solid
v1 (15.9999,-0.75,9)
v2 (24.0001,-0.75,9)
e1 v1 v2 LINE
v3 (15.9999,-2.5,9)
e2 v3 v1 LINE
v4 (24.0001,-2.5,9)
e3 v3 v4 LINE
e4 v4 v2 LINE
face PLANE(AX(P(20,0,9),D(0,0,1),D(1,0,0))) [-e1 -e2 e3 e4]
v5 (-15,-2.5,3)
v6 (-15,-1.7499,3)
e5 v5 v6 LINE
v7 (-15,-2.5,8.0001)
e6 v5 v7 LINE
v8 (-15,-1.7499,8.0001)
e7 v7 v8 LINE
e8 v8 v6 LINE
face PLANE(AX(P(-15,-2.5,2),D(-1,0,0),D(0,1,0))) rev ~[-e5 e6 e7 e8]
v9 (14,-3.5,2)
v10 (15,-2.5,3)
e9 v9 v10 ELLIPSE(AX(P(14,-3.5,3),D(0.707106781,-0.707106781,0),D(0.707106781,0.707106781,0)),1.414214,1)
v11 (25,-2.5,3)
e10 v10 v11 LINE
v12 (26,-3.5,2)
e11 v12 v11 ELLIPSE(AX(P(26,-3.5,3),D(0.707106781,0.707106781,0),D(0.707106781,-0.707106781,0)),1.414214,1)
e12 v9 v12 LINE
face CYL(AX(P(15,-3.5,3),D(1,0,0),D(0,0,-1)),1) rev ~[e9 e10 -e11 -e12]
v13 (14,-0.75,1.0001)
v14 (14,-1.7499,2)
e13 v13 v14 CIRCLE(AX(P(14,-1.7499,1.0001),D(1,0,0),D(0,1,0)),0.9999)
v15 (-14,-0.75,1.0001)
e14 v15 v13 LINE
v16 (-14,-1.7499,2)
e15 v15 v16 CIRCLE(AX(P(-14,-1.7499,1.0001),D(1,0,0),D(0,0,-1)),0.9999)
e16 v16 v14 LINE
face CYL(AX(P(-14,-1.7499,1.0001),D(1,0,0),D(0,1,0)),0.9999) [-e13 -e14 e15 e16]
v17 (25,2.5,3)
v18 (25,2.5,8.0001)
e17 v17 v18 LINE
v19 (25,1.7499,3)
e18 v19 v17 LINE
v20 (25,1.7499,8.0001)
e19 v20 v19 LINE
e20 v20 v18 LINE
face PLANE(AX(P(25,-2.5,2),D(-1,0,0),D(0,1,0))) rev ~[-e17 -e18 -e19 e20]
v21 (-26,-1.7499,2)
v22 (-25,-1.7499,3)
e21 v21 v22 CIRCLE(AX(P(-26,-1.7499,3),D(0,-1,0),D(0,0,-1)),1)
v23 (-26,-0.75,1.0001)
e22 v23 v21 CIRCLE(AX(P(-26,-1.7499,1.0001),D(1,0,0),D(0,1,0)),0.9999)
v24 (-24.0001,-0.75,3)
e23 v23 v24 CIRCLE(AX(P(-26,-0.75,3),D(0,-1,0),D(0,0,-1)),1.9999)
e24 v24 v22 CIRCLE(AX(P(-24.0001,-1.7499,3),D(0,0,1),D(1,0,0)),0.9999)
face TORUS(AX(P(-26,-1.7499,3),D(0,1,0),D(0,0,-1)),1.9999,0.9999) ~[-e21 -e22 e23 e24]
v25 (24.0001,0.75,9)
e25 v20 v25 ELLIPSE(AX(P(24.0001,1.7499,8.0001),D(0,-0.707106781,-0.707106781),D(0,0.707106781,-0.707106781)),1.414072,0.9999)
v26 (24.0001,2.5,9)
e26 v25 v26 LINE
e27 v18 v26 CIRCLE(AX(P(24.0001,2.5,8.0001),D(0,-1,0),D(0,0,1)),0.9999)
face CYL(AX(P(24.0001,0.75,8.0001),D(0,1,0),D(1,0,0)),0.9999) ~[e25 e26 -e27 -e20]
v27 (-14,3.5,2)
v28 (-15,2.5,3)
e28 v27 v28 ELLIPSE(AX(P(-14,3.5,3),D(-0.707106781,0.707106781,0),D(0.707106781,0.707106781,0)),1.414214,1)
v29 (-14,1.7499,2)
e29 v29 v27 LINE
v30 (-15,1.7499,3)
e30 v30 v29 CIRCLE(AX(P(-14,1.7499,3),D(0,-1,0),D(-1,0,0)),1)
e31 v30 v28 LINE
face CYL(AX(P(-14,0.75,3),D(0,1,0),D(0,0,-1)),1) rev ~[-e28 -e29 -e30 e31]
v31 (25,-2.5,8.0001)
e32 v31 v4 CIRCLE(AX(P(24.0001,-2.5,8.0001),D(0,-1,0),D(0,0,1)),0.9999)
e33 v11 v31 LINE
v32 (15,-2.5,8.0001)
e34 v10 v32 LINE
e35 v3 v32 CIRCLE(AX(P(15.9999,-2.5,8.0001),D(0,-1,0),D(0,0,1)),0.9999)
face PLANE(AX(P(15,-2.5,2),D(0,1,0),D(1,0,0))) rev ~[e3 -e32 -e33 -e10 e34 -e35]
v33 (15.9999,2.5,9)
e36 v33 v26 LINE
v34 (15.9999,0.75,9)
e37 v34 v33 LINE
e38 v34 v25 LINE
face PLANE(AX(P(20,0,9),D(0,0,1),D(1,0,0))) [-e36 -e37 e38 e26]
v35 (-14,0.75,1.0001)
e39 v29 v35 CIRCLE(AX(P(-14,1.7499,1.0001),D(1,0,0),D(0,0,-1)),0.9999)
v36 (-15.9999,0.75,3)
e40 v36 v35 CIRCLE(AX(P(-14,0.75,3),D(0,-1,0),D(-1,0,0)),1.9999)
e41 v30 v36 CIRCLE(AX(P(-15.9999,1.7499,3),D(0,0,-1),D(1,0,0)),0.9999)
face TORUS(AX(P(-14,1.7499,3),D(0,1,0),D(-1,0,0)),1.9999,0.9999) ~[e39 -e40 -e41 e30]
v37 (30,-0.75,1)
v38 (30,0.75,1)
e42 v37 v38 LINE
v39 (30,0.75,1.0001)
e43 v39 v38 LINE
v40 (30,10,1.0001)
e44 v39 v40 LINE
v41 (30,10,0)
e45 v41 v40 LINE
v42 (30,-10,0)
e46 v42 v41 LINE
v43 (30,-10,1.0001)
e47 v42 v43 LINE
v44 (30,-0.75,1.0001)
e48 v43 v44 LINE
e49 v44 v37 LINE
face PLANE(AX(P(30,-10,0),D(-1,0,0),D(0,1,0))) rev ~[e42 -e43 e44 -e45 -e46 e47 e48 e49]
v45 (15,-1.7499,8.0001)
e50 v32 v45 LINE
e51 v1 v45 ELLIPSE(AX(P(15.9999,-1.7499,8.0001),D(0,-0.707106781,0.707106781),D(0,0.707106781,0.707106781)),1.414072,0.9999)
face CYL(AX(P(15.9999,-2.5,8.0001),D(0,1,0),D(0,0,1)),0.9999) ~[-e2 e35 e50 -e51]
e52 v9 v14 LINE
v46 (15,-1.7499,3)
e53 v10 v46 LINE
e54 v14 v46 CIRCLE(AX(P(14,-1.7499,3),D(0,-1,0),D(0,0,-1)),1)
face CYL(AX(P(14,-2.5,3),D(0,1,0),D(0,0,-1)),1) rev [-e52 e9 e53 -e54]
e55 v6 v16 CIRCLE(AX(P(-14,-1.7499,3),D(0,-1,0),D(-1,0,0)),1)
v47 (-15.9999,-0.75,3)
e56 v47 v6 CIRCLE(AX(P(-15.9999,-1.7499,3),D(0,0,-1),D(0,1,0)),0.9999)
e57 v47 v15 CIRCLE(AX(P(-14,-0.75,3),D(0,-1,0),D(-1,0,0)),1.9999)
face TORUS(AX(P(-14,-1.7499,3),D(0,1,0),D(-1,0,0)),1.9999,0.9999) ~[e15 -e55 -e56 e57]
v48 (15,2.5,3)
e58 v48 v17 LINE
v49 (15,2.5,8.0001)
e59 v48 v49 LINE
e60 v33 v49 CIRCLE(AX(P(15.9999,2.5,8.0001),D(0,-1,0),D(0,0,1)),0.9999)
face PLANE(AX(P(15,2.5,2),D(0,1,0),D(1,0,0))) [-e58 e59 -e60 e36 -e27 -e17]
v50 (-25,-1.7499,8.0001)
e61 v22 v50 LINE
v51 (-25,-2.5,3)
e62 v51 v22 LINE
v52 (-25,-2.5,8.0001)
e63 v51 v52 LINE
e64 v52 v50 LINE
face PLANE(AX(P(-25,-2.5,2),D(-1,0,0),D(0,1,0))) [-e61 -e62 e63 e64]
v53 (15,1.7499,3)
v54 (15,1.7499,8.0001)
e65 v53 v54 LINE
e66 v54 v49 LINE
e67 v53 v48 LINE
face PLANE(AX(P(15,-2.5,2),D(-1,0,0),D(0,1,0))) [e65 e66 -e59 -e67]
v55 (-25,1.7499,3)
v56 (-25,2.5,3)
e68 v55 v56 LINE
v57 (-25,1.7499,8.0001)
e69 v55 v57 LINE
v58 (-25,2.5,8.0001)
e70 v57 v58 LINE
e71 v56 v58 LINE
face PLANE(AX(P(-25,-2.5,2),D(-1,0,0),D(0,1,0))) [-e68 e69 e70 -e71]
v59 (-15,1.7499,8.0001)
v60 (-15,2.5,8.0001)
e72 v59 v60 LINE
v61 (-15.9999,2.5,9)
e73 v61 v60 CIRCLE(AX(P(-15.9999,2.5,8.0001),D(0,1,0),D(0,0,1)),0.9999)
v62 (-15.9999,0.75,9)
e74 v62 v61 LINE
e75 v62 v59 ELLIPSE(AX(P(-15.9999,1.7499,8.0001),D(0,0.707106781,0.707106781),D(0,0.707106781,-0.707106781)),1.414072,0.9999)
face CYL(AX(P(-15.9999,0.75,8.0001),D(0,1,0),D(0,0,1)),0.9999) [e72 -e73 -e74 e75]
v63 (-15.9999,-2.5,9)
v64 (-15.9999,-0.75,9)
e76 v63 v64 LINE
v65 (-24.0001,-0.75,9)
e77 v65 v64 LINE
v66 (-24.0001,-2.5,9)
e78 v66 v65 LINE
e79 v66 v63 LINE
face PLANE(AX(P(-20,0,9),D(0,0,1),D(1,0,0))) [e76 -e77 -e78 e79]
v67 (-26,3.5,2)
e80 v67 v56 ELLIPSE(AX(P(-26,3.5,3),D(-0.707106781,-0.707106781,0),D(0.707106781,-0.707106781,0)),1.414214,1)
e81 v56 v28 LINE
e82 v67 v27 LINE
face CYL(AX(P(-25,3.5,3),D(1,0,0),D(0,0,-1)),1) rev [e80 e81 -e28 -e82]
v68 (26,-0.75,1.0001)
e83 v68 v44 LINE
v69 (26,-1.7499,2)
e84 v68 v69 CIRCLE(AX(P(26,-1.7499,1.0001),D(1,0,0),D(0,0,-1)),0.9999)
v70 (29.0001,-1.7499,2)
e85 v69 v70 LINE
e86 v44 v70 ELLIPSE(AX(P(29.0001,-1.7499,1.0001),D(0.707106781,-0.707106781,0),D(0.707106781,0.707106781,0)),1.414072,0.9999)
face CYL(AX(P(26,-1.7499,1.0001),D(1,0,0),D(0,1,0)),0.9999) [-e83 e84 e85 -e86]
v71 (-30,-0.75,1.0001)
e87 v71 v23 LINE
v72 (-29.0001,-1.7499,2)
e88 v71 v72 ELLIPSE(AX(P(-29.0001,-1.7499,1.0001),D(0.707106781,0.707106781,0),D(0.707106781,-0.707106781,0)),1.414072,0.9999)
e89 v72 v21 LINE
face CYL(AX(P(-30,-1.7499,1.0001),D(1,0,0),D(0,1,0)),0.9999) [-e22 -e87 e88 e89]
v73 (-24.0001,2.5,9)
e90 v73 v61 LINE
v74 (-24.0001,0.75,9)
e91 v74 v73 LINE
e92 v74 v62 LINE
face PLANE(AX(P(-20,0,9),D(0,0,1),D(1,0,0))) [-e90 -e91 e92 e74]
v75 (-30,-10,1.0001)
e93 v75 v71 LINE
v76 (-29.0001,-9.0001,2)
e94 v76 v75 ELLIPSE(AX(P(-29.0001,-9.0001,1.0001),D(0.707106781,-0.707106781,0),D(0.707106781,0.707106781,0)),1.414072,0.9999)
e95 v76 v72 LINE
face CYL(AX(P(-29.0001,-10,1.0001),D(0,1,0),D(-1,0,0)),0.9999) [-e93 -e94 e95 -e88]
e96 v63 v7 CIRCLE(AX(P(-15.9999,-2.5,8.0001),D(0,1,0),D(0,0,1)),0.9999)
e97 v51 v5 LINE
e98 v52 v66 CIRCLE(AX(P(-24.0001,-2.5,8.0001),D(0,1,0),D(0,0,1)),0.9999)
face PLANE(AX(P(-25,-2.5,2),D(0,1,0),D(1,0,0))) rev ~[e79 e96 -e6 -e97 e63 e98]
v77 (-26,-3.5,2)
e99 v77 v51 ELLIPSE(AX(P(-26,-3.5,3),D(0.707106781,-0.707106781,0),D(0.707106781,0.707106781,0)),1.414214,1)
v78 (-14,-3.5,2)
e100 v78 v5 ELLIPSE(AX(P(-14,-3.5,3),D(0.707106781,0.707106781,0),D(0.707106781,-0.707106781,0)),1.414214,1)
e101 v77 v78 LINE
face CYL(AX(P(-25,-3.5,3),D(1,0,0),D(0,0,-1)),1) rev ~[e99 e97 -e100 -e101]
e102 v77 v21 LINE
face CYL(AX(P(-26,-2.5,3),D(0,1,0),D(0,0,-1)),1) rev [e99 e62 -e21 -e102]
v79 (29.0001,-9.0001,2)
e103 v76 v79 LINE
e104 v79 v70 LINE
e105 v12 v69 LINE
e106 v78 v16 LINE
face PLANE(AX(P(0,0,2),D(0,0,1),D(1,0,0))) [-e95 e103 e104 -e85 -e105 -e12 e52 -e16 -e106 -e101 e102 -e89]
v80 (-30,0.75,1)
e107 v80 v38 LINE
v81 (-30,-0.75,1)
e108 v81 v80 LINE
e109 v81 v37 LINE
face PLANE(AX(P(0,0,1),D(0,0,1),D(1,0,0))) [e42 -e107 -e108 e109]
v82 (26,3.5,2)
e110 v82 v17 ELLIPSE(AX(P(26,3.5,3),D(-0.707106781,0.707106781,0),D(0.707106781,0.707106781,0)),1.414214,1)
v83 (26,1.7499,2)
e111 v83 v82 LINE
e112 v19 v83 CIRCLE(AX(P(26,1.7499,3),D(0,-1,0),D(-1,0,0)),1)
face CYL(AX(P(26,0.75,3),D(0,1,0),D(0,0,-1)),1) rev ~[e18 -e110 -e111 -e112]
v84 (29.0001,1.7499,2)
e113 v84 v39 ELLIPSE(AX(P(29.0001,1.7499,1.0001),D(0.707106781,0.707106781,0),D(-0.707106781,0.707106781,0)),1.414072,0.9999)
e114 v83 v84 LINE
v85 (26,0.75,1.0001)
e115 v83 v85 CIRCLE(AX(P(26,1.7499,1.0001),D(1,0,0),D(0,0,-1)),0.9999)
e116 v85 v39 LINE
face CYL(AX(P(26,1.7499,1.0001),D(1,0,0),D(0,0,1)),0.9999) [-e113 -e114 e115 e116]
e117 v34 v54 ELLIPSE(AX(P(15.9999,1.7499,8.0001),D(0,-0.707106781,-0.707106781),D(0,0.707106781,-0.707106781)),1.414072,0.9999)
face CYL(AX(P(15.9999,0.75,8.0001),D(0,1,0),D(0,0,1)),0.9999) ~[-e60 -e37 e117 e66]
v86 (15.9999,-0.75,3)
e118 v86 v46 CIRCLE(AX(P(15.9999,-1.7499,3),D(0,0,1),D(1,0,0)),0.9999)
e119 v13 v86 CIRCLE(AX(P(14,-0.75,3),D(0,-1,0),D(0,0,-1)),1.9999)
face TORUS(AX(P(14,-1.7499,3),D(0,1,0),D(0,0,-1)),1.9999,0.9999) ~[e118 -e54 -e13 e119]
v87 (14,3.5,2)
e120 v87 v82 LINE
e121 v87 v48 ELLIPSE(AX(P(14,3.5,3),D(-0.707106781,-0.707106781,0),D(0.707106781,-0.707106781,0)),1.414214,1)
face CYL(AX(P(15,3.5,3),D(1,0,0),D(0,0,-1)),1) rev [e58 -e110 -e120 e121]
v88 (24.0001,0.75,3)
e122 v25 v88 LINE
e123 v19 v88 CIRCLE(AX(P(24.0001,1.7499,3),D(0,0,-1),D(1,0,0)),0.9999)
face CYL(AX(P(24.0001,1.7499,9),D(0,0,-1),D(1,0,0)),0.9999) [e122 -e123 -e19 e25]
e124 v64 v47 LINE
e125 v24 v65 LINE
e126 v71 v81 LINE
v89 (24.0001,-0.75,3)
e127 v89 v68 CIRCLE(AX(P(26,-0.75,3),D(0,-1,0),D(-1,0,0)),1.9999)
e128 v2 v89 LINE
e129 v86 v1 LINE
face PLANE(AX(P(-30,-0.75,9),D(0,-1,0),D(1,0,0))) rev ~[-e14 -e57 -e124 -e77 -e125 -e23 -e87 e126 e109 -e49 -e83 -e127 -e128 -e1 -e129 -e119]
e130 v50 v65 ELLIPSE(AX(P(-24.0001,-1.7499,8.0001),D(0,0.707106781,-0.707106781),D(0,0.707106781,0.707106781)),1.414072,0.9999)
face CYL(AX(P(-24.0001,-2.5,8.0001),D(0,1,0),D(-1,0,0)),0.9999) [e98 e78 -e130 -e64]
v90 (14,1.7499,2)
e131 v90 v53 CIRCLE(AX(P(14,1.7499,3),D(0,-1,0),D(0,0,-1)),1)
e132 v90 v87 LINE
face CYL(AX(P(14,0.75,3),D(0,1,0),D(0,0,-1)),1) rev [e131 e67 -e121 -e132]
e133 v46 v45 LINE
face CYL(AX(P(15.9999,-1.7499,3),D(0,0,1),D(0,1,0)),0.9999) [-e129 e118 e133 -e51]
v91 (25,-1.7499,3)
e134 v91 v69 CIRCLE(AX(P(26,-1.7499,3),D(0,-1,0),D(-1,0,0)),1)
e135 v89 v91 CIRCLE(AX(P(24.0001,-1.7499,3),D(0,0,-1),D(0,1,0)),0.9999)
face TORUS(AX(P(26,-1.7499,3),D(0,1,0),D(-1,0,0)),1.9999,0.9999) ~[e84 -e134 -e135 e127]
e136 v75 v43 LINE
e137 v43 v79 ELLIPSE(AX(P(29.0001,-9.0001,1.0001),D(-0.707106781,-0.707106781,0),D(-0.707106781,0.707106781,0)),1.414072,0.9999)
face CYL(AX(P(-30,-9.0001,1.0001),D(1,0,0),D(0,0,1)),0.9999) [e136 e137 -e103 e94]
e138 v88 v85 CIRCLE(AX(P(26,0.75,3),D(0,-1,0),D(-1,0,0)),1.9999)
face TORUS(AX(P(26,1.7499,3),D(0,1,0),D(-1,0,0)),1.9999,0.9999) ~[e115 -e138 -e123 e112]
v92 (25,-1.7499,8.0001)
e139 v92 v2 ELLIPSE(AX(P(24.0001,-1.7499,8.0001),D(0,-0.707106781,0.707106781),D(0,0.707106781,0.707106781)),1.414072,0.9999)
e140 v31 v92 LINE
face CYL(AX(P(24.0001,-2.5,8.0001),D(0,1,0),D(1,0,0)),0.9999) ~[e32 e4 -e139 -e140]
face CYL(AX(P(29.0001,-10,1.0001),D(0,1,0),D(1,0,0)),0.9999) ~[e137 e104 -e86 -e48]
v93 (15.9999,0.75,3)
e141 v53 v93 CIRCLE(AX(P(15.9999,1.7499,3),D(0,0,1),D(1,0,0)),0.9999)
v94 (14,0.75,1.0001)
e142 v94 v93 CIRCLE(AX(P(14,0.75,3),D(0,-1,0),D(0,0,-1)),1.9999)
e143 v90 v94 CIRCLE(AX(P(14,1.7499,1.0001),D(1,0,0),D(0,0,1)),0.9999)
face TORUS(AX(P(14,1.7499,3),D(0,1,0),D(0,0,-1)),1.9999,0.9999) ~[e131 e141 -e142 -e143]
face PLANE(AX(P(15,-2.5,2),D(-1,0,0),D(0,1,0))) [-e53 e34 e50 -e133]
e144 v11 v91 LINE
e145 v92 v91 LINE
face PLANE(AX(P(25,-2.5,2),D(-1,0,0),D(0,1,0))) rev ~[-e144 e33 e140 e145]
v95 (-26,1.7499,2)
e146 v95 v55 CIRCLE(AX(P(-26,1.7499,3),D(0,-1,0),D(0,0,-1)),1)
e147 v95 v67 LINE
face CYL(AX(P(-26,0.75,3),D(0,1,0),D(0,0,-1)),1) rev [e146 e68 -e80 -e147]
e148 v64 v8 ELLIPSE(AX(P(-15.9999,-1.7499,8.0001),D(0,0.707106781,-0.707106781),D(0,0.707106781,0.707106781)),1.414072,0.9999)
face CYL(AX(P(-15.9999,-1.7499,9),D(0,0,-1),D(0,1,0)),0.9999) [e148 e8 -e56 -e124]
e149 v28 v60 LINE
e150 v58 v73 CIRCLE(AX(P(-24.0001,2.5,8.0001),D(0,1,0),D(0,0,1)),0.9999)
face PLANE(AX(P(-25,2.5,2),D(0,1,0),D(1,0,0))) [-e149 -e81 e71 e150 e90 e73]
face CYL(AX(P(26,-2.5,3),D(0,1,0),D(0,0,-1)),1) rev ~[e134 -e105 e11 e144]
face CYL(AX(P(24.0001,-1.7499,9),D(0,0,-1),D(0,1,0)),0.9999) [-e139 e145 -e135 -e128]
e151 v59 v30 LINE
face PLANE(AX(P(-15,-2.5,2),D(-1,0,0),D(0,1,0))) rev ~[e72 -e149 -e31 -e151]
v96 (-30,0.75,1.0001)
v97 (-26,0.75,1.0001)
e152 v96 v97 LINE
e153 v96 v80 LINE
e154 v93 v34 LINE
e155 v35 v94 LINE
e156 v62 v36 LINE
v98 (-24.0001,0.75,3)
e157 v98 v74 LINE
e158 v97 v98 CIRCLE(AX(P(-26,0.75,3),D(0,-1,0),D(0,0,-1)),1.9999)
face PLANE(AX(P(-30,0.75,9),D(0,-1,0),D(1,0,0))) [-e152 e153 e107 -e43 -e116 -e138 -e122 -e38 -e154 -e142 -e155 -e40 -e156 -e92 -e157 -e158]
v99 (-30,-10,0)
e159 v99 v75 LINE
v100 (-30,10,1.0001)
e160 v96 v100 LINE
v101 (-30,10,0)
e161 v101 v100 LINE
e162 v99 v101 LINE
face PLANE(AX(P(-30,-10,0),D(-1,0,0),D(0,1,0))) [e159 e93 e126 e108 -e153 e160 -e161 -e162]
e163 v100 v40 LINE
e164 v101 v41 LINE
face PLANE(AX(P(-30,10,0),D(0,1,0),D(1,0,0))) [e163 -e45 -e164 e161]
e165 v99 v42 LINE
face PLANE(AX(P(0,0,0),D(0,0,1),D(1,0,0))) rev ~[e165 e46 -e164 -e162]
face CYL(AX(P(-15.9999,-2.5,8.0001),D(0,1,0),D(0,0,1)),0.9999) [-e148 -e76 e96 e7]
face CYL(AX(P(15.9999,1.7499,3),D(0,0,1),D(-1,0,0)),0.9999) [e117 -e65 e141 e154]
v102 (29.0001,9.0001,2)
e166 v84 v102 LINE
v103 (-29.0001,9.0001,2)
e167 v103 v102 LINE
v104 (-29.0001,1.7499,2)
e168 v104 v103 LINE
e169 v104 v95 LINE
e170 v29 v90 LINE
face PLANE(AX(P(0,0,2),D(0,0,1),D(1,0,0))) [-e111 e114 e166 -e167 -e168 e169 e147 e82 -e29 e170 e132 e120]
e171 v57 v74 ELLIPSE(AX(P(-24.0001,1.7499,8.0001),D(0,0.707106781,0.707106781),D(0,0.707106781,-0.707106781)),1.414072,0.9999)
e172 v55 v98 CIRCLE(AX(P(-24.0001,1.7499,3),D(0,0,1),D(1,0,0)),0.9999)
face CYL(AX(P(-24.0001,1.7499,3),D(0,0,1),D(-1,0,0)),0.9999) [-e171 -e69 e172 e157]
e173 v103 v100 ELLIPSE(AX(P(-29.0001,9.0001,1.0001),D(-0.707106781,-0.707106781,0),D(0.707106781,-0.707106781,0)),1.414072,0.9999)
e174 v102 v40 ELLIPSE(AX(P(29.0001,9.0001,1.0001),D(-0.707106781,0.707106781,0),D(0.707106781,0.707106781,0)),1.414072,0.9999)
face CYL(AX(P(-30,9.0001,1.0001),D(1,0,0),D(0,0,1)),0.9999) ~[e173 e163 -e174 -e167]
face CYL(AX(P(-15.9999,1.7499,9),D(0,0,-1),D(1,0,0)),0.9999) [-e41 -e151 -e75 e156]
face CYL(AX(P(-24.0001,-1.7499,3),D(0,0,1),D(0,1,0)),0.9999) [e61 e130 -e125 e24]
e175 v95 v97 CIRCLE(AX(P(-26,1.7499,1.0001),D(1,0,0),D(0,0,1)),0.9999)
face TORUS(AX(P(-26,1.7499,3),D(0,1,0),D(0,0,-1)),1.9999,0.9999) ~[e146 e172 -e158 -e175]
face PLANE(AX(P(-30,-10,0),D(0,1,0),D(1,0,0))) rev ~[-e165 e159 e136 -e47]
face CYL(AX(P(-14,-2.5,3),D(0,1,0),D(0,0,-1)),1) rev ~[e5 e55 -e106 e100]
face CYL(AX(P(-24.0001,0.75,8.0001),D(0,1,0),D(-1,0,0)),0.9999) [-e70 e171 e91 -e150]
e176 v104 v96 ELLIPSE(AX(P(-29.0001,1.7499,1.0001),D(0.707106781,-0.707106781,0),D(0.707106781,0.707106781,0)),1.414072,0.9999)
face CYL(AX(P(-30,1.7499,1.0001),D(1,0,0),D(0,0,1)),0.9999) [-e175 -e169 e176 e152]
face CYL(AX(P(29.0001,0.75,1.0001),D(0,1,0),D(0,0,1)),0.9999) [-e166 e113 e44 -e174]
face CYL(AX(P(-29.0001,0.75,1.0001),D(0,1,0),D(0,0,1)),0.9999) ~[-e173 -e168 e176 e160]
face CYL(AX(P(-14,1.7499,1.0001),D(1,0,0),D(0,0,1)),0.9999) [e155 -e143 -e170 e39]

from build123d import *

# Parameters (mm, degrees)
F0_W     = 60
F0_H     = 20
F1_DEPTH = 2
F2_W     = 10
F2_H     = 5
F3_DEPTH = 7
F4_W     = 60
F4_H     = 1.5
F5_DEPTH = 8
F6_F1_R  = 1
F6_F2_R  = 0.9999


# Not quite as in the source:
# - a fillet or chamfer is up to 0.001 mm smaller than in the source, because OpenCascade refuses the exact size


with BuildPart() as f1:
    # F0 (on Top) → F1 (new body)
    with BuildSketch(Plane.XY):
        Rectangle(F0_W, F0_H)
    extrude(amount=F1_DEPTH)

    # F2 (on face) → F3 (join)
    with BuildSketch(Plane.XY.offset(2)):
        with Locations((-20, 0)):
            Rectangle(F2_W, F2_H)
        with Locations((20, 0)):
            Rectangle(F2_W, F2_H)
    extrude(amount=F3_DEPTH)

    # F4 (on face) → F5 (cut)
    with BuildSketch(Plane.XY.offset(9)):
        Rectangle(F4_W, F4_H)
    extrude(amount=-F5_DEPTH, mode=Mode.SUBTRACT)

    # F6: fillet of radius 1 on 32 edges, made by hand

    # F6_f1
    f6_f1_edges = [f1.edges().sort_by_distance(p)[0] for p in [
        (-25, -1.625, 2),
        (-20, -2.5, 2),
        (-15, -1.625, 2),
        (15, -1.625, 2),
        (20, -2.5, 2),
        (25, -1.625, 2),
        (25, 1.625, 2),
        (20, 2.5, 2),
        (15, 1.625, 2),
        (-15, 1.625, 2),
        (-20, 2.5, 2),
        (-25, 1.625, 2),
    ]]
    fillet(f6_f1_edges, radius=F6_F1_R)

    # F6_f2 (radius 1 in the source; OpenCascade refuses exactly that, so slightly less here)
    f6_f2_edges = [f1.edges().sort_by_distance(p)[0] for p in [
        (-15, 1.625, 9),
        (-25, 1.625, 9),
        (-25, -1.625, 9),
        (-15, -1.625, 9),
        (15, 1.625, 9),
        (15, -1.625, 9),
        (25, 1.625, 9),
        (25, -1.625, 9),
        (-28, -0.75, 2),
        (0, -0.75, 2),
        (28, -0.75, 2),
        (30, -5.375, 2),
        (0, -10, 2),
        (-30, -5.375, 2),
        (0, 10, 2),
        (30, 5.375, 2),
        (28, 0.75, 2),
        (0, 0.75, 2),
        (-28, 0.75, 2),
        (-30, 5.375, 2),
        (-25.2928932188, 0.75, 2.2928932188),
        (14.7071067812, 0.75, 2.2928932188),
        (-14.7071067812, 0.75, 2.2928932188),
        (25.2928932188, 0.75, 2.2928932188),
        (25.2928932188, -0.75, 2.2928932188),
        (-14.7071067812, -0.75, 2.2928932188),
        (14.7071067812, -0.75, 2.2928932188),
        (-25.2928932188, -0.75, 2.2928932188),
    ]]
    fillet(f6_f2_edges, radius=F6_F2_R)


solid = f1.part
